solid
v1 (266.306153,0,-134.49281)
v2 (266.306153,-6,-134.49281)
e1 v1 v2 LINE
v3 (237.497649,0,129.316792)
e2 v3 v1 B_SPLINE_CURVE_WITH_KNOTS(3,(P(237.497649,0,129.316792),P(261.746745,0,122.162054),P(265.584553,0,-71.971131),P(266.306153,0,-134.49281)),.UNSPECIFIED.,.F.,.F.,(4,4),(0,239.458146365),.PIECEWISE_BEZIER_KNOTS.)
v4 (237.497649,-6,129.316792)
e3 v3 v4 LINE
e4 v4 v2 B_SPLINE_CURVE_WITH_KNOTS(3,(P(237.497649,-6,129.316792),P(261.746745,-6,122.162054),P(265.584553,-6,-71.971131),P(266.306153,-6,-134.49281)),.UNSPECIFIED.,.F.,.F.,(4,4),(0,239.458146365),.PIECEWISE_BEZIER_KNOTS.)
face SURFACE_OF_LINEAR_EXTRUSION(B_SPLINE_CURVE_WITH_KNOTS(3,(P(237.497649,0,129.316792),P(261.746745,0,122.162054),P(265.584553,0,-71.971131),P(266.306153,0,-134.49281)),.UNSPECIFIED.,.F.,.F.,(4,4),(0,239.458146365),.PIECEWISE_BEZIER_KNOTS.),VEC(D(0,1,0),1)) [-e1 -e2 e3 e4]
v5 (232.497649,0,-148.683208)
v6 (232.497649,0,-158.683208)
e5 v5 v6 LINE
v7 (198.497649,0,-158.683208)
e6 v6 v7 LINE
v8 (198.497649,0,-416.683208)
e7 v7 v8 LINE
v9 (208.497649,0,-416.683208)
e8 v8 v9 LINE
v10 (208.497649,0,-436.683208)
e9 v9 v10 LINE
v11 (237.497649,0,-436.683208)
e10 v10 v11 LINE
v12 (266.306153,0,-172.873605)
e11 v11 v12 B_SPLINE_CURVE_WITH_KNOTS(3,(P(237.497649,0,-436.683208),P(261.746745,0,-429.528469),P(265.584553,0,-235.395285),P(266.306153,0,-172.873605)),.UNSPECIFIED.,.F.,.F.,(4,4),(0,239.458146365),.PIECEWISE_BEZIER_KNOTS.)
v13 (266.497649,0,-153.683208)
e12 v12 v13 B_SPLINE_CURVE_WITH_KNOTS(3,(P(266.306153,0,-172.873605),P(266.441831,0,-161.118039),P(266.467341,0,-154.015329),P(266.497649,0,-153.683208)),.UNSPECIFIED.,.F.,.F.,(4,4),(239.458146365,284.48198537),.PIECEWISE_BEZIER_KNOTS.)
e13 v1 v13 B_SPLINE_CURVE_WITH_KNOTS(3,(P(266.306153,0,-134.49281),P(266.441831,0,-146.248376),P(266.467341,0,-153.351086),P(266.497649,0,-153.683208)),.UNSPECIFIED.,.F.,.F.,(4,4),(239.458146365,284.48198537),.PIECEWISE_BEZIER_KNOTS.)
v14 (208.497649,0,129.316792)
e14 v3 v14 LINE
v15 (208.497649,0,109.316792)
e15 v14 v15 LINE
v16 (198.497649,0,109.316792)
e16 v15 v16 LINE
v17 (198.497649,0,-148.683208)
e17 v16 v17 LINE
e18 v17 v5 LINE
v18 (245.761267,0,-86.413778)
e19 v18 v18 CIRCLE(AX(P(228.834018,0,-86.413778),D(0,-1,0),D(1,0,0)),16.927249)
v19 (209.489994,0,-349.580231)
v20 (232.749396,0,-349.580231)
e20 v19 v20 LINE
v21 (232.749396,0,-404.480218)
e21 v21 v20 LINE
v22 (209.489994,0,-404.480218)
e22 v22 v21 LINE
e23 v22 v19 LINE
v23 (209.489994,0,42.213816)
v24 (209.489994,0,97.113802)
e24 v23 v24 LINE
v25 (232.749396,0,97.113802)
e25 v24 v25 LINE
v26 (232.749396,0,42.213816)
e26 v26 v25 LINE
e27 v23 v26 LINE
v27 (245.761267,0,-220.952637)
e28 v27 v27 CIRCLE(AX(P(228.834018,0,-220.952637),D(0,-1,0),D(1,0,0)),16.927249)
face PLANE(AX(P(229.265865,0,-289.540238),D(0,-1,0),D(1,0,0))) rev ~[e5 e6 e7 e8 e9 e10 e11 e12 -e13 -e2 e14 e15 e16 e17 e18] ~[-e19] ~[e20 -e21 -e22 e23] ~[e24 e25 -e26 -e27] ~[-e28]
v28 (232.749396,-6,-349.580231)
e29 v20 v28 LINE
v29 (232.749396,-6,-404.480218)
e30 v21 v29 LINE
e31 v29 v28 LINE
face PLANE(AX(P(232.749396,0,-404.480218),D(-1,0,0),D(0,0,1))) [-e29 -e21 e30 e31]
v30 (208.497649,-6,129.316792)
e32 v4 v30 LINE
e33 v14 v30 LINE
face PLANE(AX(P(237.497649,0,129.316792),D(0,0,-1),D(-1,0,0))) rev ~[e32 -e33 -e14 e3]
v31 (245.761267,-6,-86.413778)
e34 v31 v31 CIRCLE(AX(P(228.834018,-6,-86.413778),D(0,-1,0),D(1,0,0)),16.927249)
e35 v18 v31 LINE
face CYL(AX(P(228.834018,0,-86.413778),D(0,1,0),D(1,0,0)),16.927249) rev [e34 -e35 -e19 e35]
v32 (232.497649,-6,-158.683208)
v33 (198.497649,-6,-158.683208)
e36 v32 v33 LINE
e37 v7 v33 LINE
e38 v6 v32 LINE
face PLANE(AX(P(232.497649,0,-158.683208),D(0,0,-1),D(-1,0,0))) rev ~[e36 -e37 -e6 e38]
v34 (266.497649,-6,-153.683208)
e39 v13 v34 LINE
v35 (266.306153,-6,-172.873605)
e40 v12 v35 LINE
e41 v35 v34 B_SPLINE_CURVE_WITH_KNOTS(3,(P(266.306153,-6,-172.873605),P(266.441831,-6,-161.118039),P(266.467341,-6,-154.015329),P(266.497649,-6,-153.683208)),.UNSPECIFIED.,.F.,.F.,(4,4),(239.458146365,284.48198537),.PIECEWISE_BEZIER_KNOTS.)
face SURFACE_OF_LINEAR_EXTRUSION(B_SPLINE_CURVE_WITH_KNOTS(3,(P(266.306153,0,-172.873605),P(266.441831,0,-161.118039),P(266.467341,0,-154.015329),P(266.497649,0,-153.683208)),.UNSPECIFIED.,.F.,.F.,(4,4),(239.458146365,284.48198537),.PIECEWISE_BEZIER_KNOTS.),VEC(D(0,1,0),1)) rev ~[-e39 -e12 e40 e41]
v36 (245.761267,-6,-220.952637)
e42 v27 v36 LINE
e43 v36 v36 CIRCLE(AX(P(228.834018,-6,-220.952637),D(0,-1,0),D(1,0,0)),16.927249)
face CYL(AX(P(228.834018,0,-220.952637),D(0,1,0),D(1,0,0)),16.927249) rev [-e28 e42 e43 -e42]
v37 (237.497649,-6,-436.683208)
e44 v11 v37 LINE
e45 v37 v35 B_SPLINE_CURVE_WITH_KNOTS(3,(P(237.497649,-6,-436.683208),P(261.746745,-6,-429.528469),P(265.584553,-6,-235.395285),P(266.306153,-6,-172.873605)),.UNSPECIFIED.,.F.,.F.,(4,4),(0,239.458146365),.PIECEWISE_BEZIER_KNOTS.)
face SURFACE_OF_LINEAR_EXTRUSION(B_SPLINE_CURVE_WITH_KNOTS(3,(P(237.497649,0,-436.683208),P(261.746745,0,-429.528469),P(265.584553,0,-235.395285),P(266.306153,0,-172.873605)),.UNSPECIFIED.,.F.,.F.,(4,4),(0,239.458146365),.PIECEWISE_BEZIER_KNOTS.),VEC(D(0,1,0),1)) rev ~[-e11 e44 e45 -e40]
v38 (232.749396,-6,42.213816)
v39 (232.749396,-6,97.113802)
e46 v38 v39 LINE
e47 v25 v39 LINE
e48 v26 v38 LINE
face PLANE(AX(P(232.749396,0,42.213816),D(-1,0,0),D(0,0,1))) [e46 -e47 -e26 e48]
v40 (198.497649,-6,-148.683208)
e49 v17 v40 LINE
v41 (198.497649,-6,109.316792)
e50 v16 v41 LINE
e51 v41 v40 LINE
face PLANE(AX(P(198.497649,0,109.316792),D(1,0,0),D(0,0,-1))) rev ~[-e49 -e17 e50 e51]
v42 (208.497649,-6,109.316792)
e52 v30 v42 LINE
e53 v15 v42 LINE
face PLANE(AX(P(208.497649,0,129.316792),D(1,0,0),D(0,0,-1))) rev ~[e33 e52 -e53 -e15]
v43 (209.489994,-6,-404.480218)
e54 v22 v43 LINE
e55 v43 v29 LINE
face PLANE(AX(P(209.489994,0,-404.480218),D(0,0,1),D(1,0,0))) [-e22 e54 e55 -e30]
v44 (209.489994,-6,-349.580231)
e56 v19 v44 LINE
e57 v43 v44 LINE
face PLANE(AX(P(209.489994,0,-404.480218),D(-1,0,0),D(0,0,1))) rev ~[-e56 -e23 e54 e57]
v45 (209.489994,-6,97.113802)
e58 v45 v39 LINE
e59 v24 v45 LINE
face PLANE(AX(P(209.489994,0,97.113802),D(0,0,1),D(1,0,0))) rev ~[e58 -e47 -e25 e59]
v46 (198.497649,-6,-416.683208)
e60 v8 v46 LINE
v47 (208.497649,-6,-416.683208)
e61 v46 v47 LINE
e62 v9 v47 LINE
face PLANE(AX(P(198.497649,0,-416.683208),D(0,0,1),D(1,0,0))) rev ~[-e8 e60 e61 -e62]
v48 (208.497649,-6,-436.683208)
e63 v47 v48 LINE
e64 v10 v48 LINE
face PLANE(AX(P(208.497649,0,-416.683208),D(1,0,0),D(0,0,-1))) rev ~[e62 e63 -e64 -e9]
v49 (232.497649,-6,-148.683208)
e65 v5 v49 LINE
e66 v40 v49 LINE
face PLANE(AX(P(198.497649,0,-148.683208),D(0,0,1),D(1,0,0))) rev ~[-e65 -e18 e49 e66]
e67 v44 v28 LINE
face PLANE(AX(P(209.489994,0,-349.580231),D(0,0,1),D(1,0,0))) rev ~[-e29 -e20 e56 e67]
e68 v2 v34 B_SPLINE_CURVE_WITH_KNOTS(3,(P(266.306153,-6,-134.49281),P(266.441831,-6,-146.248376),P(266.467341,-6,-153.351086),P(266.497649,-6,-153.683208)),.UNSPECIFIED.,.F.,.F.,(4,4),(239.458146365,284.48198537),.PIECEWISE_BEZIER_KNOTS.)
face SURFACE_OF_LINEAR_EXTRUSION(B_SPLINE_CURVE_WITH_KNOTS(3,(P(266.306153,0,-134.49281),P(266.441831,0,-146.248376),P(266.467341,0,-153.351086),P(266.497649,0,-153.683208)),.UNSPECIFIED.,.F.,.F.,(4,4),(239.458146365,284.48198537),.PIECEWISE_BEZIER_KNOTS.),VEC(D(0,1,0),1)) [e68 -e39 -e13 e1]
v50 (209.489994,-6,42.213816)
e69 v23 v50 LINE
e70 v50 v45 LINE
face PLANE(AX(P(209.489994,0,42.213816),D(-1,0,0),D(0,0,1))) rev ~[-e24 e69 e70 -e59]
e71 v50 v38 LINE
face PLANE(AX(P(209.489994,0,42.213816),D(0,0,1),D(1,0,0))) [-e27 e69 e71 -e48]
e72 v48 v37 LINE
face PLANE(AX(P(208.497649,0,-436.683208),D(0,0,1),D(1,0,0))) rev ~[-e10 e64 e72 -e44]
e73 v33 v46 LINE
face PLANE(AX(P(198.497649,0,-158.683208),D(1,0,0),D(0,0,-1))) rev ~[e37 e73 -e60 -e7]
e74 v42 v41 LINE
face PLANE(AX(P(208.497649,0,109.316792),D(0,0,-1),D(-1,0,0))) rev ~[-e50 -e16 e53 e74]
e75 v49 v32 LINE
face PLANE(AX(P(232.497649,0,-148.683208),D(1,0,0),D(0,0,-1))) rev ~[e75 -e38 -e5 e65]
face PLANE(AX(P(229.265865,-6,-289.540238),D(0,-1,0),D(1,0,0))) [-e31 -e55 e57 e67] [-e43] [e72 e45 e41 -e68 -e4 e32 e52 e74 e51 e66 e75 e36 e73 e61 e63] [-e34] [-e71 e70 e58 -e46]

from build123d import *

# Parameters (mm, degrees)
F0_W     = 23.2594013214
F0_H     = 54.8999868333
F0_R     = 16.9272487263
F1_DEPTH = 6


# Not quite as in the source:
# - a feature names something its author has since deleted; it is built from what else it names


with BuildPart() as f1:
    # F0 (on Front) → F1 (new body)
    with BuildSketch(Plane.XZ):
        with BuildLine():
            add(Edge.make_bspline(
                [(266.3061527885, -172.8736048774), (266.4418306907, -161.1180388855), (266.4673413702, -154.0153294904), (266.4976486654, -153.6832076827)],
                knots=[239.4581463651, 239.4581463651, 239.4581463651, 239.4581463651, 284.4819853699, 284.4819853699, 284.4819853699, 284.4819853699], degree=3))
            Line((266.4976486654, -153.6832076827), (232.4976486654, -153.6832076827))
            Line((232.4976486654, -153.6832076827), (232.4976486654, -158.6832076827))
            Line((232.4976486654, -158.6832076827), (198.4976486654, -158.6832076827))
            Line((198.4976486654, -158.6832076827), (198.4976486654, -416.6832076827))
            Line((198.4976486654, -416.6832076827), (208.4976486654, -416.6832076827))
            Line((208.4976486654, -416.6832076827), (208.4976486654, -436.6832076827))
            Line((208.4976486654, -436.6832076827), (237.4976486654, -436.6832076827))
            add(Edge.make_bspline(
                [(237.4976486654, -436.6832076827), (261.7467447475, -429.5284690744), (265.5845533054, -235.3952845947), (266.3061527885, -172.8736048774)],
                knots=[0, 0, 0, 0, 239.4581463651, 239.4581463651, 239.4581463651, 239.4581463651], degree=3))
        make_face()
        with Locations((221.1196951035, -377.0302243151)):
            Rectangle(F0_W, F0_H, mode=Mode.SUBTRACT)
        with Locations((228.8340181112, -220.9526370094)):
            Circle(F0_R, mode=Mode.SUBTRACT)
        with BuildLine():
            add(Edge.make_bspline(
                [(237.4976486654, 129.3167923173), (261.7467447475, 122.1620537089), (265.5845533054, -71.9711307708), (266.3061527885, -134.492810488)],
                knots=[0, 0, 0, 0, 239.4581463651, 239.4581463651, 239.4581463651, 239.4581463651], degree=3))
            Line((237.4976486654, 129.3167923173), (208.4976486654, 129.3167923173))
            Line((208.4976486654, 129.3167923173), (208.4976486654, 109.3167923173))
            Line((208.4976486654, 109.3167923173), (198.4976486654, 109.3167923173))
            Line((198.4976486654, 109.3167923173), (198.4976486654, -148.6832076827))
            Line((198.4976486654, -148.6832076827), (232.4976486654, -148.6832076827))
            Line((232.4976486654, -148.6832076827), (232.4976486654, -153.6832076827))
            Line((232.4976486654, -153.6832076827), (266.4976486654, -153.6832076827))
            add(Edge.make_bspline(
                [(266.3061527885, -134.492810488), (266.4418306907, -146.24837648), (266.4673413702, -153.3510858751), (266.4976486654, -153.6832076827)],
                knots=[239.4581463651, 239.4581463651, 239.4581463651, 239.4581463651, 284.4819853699, 284.4819853699, 284.4819853699, 284.4819853699], degree=3))
        make_face()
        with Locations((228.8340181112, -86.4137783561)):
            Circle(F0_R, mode=Mode.SUBTRACT)
        with Locations((221.1196951035, 69.6638089497)):
            Rectangle(F0_W, F0_H, mode=Mode.SUBTRACT)
    extrude(amount=F1_DEPTH)


solid = f1.part
